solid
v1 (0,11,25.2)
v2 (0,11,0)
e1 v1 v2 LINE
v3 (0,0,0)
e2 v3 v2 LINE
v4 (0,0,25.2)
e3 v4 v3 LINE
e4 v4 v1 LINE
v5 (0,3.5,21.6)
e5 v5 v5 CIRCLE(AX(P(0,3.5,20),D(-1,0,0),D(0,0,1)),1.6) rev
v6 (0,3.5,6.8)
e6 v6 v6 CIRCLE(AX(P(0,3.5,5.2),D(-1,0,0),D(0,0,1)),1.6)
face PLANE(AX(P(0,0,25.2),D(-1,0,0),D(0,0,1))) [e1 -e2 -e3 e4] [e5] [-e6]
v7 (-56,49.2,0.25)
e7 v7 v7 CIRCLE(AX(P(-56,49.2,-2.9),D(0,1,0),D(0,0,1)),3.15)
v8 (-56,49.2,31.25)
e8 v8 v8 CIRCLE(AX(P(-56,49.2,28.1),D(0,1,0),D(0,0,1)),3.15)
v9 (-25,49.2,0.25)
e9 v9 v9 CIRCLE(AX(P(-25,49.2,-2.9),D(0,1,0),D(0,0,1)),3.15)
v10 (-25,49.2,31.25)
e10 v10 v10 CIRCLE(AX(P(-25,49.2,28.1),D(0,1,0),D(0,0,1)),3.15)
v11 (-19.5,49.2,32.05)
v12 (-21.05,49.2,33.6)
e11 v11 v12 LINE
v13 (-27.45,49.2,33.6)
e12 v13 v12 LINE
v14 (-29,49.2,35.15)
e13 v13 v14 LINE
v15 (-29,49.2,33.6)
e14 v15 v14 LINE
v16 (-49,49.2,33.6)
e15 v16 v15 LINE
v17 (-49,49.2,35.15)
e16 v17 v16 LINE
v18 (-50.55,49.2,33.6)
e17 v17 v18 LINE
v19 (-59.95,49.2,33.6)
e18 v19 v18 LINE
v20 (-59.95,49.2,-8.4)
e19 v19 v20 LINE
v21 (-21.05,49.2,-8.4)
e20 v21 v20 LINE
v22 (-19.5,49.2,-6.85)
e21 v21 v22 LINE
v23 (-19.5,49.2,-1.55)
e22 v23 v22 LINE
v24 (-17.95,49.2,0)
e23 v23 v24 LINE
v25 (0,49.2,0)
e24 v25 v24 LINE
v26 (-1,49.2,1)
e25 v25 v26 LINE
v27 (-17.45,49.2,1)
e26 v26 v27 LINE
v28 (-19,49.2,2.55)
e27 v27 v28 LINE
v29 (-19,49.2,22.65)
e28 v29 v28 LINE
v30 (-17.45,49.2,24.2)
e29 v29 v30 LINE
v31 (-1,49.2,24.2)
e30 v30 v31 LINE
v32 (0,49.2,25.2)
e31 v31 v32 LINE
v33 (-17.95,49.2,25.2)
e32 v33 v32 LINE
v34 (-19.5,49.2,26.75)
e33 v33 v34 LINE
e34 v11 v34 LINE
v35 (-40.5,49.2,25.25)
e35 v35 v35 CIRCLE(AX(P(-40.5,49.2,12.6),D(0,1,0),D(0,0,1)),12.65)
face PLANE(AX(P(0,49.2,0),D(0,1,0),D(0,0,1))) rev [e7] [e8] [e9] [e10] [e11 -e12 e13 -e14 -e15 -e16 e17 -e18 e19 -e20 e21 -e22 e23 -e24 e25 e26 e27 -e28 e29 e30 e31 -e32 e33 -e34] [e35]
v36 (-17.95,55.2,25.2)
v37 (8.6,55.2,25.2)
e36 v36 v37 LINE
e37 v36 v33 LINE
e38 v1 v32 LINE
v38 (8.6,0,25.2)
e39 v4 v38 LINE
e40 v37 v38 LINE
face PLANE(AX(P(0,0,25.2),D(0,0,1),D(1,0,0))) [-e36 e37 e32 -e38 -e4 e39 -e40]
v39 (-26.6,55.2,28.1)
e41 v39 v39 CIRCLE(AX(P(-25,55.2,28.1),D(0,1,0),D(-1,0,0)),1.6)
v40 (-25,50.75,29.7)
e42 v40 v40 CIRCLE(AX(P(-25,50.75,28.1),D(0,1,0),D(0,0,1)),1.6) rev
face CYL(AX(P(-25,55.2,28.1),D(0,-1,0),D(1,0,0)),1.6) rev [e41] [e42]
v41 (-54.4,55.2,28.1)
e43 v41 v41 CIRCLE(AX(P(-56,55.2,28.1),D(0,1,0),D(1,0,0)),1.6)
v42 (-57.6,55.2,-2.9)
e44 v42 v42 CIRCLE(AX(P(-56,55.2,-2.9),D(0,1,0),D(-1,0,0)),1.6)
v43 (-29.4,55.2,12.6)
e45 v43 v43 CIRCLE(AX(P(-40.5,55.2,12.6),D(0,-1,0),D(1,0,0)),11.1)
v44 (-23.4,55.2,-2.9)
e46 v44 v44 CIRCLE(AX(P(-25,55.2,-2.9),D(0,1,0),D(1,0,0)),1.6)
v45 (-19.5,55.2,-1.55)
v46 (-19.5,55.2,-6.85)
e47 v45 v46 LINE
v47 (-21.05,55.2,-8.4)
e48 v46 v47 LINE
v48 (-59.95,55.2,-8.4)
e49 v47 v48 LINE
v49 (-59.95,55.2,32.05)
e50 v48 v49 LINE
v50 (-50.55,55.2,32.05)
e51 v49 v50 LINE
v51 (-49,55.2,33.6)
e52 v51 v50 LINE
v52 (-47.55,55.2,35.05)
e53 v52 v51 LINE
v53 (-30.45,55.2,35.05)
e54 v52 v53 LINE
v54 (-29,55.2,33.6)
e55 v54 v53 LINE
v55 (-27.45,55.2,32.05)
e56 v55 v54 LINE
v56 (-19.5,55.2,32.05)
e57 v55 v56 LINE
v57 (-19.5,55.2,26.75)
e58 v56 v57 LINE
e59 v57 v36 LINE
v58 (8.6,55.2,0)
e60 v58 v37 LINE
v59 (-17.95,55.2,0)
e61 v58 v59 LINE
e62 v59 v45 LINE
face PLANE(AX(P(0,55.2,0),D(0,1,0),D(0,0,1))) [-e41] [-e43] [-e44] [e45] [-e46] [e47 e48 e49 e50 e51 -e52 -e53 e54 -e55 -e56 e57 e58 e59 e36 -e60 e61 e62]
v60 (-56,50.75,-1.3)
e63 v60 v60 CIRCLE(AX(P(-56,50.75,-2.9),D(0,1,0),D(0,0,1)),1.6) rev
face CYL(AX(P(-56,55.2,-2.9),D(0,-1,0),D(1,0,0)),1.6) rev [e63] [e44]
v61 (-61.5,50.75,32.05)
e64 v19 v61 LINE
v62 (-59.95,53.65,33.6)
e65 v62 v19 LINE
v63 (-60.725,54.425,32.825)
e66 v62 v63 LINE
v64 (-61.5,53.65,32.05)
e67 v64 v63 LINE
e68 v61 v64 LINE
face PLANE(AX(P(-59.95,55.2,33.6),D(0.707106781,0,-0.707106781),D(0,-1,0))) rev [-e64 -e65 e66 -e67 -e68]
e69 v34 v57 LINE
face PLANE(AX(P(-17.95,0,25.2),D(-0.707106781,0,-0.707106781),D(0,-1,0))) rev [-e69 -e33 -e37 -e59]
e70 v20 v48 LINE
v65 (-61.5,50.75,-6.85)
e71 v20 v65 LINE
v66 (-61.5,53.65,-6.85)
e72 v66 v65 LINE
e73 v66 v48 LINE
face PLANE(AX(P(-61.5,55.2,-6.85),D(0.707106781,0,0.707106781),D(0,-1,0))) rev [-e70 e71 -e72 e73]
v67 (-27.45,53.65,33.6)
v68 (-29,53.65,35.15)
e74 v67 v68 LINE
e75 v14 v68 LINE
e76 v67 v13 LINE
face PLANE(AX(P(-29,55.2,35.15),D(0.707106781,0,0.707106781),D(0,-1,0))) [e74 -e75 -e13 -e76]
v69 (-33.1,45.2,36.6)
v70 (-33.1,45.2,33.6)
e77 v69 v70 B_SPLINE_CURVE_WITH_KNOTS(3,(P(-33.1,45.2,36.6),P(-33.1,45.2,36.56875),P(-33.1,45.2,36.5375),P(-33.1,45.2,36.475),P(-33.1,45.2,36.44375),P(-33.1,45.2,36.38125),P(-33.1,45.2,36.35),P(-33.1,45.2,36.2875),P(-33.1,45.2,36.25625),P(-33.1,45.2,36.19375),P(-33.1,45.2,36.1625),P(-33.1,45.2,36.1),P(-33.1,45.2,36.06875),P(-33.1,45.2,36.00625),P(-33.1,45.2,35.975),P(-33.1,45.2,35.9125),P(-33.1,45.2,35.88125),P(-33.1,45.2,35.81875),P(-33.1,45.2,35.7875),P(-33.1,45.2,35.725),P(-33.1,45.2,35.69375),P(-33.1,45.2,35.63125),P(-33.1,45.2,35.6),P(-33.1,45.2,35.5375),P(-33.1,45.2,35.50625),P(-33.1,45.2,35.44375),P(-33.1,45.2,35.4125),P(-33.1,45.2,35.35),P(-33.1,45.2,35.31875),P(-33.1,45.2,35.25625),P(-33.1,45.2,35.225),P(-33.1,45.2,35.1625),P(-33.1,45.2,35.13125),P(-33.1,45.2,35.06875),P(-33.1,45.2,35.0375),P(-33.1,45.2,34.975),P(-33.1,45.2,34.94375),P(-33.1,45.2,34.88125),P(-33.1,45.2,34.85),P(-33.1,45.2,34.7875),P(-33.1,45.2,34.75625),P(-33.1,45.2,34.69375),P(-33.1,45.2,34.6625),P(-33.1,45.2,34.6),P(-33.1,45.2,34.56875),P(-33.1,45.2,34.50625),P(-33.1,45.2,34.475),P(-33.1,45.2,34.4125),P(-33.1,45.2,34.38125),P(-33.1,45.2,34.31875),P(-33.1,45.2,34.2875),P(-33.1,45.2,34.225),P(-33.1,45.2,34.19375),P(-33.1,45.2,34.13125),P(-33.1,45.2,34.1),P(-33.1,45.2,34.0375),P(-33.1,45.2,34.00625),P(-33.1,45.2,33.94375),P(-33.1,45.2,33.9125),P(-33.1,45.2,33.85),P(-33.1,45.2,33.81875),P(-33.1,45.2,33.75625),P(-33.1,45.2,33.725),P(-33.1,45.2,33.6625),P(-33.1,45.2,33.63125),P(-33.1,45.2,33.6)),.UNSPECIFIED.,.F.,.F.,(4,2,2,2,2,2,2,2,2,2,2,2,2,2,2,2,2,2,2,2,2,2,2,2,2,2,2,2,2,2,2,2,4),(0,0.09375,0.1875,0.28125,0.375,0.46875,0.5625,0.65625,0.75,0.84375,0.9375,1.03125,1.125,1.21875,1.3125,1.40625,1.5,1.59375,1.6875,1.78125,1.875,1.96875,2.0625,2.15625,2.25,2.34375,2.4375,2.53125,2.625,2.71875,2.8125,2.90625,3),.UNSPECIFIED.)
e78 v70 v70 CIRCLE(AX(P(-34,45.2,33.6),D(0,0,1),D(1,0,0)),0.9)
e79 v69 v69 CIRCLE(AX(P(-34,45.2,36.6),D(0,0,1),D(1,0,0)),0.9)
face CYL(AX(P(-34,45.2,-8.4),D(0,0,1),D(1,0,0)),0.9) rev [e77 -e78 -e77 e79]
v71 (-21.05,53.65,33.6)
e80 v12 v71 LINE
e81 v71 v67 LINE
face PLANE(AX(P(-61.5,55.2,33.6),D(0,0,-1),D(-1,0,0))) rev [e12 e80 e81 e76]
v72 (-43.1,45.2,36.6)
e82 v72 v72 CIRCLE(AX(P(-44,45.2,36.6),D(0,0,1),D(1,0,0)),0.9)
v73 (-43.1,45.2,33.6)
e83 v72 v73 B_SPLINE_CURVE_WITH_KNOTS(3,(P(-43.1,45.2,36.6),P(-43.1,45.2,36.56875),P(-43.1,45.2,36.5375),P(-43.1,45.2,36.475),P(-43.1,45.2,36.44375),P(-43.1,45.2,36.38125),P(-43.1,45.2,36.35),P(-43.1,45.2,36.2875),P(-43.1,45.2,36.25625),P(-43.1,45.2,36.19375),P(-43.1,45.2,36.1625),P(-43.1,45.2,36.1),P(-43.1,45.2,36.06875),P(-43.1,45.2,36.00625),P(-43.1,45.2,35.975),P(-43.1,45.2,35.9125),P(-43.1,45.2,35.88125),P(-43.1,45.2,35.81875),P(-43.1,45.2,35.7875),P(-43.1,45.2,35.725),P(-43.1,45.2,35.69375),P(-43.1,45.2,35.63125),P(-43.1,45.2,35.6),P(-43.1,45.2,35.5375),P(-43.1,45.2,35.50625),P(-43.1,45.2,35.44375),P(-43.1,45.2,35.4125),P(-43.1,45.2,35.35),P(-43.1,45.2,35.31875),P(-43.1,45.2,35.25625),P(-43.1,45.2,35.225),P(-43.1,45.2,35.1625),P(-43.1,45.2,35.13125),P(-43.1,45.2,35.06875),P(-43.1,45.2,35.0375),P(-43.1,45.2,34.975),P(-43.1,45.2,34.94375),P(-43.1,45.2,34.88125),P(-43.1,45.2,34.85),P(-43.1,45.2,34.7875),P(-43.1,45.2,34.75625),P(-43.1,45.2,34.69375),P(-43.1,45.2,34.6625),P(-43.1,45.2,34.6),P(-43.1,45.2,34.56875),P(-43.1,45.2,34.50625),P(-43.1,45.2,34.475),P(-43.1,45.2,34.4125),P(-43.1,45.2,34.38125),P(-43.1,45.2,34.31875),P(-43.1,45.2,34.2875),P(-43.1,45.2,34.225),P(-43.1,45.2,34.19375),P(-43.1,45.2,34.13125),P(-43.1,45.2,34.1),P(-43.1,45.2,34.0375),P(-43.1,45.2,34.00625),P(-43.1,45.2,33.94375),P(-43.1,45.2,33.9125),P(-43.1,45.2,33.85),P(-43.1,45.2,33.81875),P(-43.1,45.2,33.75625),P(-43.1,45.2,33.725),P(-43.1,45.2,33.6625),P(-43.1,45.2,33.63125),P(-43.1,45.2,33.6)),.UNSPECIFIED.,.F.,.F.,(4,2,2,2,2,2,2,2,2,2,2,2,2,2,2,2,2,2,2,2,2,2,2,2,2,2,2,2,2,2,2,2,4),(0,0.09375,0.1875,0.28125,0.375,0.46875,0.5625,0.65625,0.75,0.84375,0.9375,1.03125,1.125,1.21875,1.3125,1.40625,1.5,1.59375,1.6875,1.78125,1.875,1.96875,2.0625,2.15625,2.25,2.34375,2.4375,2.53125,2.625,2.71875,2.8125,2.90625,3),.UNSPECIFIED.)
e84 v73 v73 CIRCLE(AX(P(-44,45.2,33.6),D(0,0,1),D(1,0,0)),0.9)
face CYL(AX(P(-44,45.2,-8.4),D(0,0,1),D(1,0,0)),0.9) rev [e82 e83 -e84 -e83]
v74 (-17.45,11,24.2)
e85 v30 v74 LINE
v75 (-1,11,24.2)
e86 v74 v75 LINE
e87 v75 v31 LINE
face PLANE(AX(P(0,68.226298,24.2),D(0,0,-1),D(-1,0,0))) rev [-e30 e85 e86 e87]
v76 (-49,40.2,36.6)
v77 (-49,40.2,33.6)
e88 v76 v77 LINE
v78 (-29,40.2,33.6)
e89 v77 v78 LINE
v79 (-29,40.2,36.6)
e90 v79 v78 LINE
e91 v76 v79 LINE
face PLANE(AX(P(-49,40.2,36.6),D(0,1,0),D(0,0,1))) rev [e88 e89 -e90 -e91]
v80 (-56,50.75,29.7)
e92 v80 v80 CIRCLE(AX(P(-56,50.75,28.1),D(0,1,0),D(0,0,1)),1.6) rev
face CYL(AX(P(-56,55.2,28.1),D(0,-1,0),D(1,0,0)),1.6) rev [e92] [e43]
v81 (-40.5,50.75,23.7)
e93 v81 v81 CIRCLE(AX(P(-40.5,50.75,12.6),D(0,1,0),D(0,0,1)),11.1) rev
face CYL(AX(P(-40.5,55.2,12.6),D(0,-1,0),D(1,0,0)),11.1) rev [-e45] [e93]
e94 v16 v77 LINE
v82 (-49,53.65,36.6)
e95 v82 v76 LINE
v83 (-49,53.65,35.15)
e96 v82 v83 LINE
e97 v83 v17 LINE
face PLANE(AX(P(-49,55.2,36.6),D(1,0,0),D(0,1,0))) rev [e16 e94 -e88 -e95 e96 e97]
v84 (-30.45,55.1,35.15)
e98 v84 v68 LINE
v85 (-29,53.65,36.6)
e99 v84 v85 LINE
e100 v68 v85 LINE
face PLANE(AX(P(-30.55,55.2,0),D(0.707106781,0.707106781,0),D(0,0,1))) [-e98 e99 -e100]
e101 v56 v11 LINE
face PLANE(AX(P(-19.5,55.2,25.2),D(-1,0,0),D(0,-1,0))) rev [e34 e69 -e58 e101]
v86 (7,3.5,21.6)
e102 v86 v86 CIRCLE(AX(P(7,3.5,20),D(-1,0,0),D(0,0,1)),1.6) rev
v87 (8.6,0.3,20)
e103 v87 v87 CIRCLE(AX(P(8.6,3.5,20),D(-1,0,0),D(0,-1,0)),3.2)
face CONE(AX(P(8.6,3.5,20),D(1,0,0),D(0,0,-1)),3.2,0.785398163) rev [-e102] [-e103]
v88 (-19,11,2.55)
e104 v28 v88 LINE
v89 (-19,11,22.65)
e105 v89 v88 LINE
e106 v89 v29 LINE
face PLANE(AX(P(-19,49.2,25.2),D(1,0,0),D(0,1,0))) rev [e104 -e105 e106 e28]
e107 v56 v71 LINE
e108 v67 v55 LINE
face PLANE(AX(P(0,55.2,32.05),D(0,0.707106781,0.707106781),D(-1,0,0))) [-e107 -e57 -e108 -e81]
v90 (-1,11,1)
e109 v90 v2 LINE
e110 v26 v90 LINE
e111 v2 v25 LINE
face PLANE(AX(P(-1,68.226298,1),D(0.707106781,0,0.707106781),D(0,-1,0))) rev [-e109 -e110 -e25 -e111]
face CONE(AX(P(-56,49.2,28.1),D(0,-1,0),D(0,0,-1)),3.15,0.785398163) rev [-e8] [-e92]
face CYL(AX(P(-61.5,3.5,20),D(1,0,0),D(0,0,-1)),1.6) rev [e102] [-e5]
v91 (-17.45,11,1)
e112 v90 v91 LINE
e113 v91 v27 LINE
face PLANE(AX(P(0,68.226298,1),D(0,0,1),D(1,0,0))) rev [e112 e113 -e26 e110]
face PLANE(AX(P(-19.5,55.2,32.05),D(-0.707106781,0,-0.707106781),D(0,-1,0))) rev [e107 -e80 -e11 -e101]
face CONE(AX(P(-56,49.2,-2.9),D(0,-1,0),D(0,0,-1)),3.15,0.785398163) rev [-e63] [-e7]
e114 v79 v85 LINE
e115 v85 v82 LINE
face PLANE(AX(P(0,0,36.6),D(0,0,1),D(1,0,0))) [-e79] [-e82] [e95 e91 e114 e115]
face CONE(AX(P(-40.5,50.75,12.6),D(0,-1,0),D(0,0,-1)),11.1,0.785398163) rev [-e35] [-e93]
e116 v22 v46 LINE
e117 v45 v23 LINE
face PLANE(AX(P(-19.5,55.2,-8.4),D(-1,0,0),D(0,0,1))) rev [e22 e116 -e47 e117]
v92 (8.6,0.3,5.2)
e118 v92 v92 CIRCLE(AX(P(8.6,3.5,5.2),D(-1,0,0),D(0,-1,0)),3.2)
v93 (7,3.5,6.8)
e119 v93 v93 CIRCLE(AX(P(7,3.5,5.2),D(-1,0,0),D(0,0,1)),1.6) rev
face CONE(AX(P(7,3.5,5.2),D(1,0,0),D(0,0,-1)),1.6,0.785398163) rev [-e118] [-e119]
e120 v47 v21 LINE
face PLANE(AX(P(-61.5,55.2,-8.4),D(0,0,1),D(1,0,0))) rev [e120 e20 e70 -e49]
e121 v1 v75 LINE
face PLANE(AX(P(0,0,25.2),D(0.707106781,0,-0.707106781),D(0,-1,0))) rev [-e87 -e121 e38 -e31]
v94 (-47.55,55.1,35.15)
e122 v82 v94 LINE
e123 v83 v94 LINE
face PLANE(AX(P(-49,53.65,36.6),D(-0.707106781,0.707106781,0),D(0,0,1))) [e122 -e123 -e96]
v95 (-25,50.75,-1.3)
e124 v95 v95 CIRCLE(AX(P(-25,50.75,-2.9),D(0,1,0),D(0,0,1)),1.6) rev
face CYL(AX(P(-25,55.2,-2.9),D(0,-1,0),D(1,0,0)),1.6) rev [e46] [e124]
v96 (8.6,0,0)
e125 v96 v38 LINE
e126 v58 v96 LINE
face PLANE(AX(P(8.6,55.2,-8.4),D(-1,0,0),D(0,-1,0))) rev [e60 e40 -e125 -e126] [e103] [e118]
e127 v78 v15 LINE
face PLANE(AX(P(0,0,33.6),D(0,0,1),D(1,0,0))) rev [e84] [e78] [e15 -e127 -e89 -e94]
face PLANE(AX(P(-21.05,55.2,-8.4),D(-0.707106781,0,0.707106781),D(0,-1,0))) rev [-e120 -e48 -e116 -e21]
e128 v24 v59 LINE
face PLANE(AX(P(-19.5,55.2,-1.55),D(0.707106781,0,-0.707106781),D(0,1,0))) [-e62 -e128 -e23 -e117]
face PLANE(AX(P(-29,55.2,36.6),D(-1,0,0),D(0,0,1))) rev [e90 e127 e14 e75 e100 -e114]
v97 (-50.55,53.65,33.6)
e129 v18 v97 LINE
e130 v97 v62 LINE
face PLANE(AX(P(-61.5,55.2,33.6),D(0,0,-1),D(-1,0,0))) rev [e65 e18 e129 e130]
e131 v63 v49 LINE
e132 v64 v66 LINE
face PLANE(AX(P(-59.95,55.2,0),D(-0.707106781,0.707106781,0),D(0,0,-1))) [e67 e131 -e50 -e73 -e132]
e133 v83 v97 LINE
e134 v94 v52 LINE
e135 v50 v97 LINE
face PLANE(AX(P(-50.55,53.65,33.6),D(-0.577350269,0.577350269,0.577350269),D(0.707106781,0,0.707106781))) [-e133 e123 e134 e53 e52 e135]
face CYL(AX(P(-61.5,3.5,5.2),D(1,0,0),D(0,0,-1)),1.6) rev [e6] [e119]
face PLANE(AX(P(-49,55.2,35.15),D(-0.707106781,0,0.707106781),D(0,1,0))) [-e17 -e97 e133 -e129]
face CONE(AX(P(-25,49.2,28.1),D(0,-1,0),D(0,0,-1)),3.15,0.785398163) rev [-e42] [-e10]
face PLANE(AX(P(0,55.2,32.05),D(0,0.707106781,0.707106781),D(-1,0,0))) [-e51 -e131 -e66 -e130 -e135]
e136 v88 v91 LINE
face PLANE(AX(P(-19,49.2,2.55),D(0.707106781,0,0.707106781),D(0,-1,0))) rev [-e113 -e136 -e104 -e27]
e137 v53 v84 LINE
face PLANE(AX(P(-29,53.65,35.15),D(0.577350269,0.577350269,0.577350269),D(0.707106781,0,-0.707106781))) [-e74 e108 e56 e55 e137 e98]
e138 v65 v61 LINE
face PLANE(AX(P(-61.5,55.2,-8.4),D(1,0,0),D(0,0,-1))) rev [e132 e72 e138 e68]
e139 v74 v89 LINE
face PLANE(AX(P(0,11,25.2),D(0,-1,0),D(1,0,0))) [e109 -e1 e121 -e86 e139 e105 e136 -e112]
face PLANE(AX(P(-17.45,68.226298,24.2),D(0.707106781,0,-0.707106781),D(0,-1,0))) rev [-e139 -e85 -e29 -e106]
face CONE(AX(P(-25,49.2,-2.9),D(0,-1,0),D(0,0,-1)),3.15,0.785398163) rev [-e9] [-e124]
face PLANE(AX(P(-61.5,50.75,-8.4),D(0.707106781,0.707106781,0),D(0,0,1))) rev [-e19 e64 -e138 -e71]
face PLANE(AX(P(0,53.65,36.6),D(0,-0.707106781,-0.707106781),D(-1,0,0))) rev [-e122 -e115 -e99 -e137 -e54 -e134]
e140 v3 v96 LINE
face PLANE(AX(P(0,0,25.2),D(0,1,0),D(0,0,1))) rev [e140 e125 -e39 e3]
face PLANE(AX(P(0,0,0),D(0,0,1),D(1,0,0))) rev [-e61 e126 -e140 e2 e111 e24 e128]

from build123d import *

# Parameters (mm, degrees)
BOSS_EXTRUDE1_DEPTH = 25.2
SKETCH2_R           = 1.6
BOSS_EXTRUDE2_DEPTH = 6
SKETCH3_W           = 19
SKETCH3_H           = 1
CUT_EXTRUDE1_DEPTH  = 38.2
CHAMFER2_SIZE       = 1.55
SKETCH4_R           = 11.1
CUT_EXTRUDE2_DEPTH  = 86.626222619
CHAMFER3_SIZE       = 1.55
CHAMFER4_SIZE       = 1
SKETCH5_R           = 1.6
CUT_EXTRUDE3_DEPTH  = 96.48869043
SKETCH6_W           = 20
SKETCH6_H           = 15
BOSS_EXTRUDE3_DEPTH = 3
SKETCH7_R           = 0.9
CUT_EXTRUDE4_DEPTH  = 95.097236941
CHAMFER7_SIZE       = 1.55
CHAMFER8_SIZE       = 1.55
SKETCH8_W           = 0.2
SKETCH8_H           = 55.2
CUT_EXTRUDE5_DEPTH  = 90.209024207
CHAMFER9_SIZE       = 1.6


with BuildPart() as part:
    # Sketch1 → Boss-Extrude1 (new body)
    with BuildSketch(Plane.XY):
        Polygon((0, 0), (0, 11), (-19, 11), (-19, 49.2), (8.8, 49.2), (8.8, 0), align=None)
    extrude(amount=BOSS_EXTRUDE1_DEPTH)

    # Sketch2 → Boss-Extrude2 (add)
    with BuildSketch(Plane(origin=(0, 49.2, 0), x_dir=(1, 0, 0), z_dir=(0, 1, 0))):
        Polygon((-61.5, 8.4), (-19.5, 8.4), (-19.5, 0), (8.8, 0), (8.8, -25.2), (-19.5, -25.2), (-19.5, -33.6), (-61.5, -33.6), align=None)
        with Locations(Location((-56, 2.9, 0), (0, 0, 180))):
            Circle(SKETCH2_R, mode=Mode.SUBTRACT)
        with Locations((-56, -28.1)):
            Circle(SKETCH2_R, mode=Mode.SUBTRACT)
        with Locations(Location((-25, -28.1, 0), (0, 0, 180))):
            Circle(SKETCH2_R, mode=Mode.SUBTRACT)
        with Locations((-25, 2.9)):
            Circle(SKETCH2_R, mode=Mode.SUBTRACT)
    extrude(amount=BOSS_EXTRUDE2_DEPTH)

    # Sketch3 → Cut-Extrude1 (cut)
    with BuildSketch(Plane.XZ.offset(-11)):
        with Locations((-9.5, 24.7)):
            Rectangle(SKETCH3_W, SKETCH3_H)
        with Locations((-9.5, 0.5)):
            Rectangle(SKETCH3_W, SKETCH3_H)
    extrude(amount=-CUT_EXTRUDE1_DEPTH, mode=Mode.SUBTRACT)

    # Chamfer2
    chamfer2_edges = [part.edges().sort_by_distance(p)[0] for p in [
        (-54.4, 49.2, -2.9),
        (-57.6, 49.2, 28.1),
        (-23.4, 49.2, 28.1),
        (-26.6, 49.2, -2.9),
    ]]
    chamfer(chamfer2_edges, length=CHAMFER2_SIZE)

    # Sketch4 → Cut-Extrude2 (cut, through all)
    with BuildSketch(Plane.XZ.offset(-49.2)):
        with Locations((-40.5, 12.6)):
            Circle(SKETCH4_R)
    extrude(amount=-CUT_EXTRUDE2_DEPTH, mode=Mode.SUBTRACT)

    # Chamfer3
    chamfer3_edges = [part.edges().sort_by_distance(p)[0] for p in [
        (-61.5, 55.2, 12.6),
        (-19.5, 52.2, 0),
        (-19.5, 52.2, -8.4),
        (-61.5, 49.2, 12.6),
        (-61.5, 52.2, -8.4),
        (-61.5, 52.2, 33.6),
        (-19.5, 52.2, 33.6),
        (-19.5, 52.2, 25.2),
        (-19, 30.1, 24.2),
        (-19, 30.1, 1),
        (-51.6, 49.2, 12.6),
    ]]
    chamfer(chamfer3_edges, length=CHAMFER3_SIZE)

    # Chamfer4
    chamfer4_edges = [part.edges().sort_by_distance(p)[0] for p in [
        (0, 30.1, 24.2),
        (0, 30.1, 1),
    ]]
    chamfer(chamfer4_edges, length=CHAMFER4_SIZE - 0.0001)  # a hair under: the kernel refuses the full size

    # Sketch5 → Cut-Extrude3 (cut, through all)
    with BuildSketch(Plane(origin=(8.8, 0, 0), x_dir=(0, 0, -1), z_dir=(1, 0, 0))):
        with Locations((-5.2, 3.5)):
            Circle(SKETCH5_R)
        with Locations(Location((-20, 3.5, 0), (0, 0, 180))):
            Circle(SKETCH5_R)
    extrude(amount=-CUT_EXTRUDE3_DEPTH, mode=Mode.SUBTRACT)

    # Sketch6 → Boss-Extrude3 (add)
    with BuildSketch(Plane.XY.offset(33.6)):
        with Locations((-39, 47.7)):
            Rectangle(SKETCH6_W, SKETCH6_H)
    extrude(amount=BOSS_EXTRUDE3_DEPTH)

    # Sketch7 → Cut-Extrude4 (cut, through all)
    with BuildSketch(Plane.XY.offset(36.6)):
        with Locations((-34, 45.2)):
            Circle(SKETCH7_R)
        with Locations((-44, 45.2)):
            Circle(SKETCH7_R)
    extrude(amount=-CUT_EXTRUDE4_DEPTH, mode=Mode.SUBTRACT)

    # Chamfer7
    chamfer7_edges = [part.edges().sort_by_distance(p)[0] for p in [
        (-29, 52.2, 33.6),
        (-25.025, 55.2, 33.6),
        (-29, 55.2, 35.1),
        (-49, 52.2, 33.6),
        (-49, 55.2, 35.1),
        (-54.475, 55.2, 33.6),
    ]]
    chamfer(chamfer7_edges, length=CHAMFER7_SIZE)

    # Chamfer8
    chamfer8_edges = [part.edges().sort_by_distance(p)[0] for p in [
        (-39, 55.2, 36.6),
    ]]
    chamfer(chamfer8_edges, length=CHAMFER8_SIZE)

    # Sketch8 → Cut-Extrude5 (cut, through all)
    with BuildSketch(Plane.XY.offset(25.2)):
        with Locations((8.7, 27.6)):
            Rectangle(SKETCH8_W, SKETCH8_H)
    extrude(amount=-CUT_EXTRUDE5_DEPTH, mode=Mode.SUBTRACT)

    # Chamfer9
    chamfer9_edges = [part.edges().sort_by_distance(p)[0] for p in [
        (8.6, 3.5, 6.8),
        (8.6, 3.5, 18.4),
    ]]
    chamfer(chamfer9_edges, length=CHAMFER9_SIZE)


solid = part.part
